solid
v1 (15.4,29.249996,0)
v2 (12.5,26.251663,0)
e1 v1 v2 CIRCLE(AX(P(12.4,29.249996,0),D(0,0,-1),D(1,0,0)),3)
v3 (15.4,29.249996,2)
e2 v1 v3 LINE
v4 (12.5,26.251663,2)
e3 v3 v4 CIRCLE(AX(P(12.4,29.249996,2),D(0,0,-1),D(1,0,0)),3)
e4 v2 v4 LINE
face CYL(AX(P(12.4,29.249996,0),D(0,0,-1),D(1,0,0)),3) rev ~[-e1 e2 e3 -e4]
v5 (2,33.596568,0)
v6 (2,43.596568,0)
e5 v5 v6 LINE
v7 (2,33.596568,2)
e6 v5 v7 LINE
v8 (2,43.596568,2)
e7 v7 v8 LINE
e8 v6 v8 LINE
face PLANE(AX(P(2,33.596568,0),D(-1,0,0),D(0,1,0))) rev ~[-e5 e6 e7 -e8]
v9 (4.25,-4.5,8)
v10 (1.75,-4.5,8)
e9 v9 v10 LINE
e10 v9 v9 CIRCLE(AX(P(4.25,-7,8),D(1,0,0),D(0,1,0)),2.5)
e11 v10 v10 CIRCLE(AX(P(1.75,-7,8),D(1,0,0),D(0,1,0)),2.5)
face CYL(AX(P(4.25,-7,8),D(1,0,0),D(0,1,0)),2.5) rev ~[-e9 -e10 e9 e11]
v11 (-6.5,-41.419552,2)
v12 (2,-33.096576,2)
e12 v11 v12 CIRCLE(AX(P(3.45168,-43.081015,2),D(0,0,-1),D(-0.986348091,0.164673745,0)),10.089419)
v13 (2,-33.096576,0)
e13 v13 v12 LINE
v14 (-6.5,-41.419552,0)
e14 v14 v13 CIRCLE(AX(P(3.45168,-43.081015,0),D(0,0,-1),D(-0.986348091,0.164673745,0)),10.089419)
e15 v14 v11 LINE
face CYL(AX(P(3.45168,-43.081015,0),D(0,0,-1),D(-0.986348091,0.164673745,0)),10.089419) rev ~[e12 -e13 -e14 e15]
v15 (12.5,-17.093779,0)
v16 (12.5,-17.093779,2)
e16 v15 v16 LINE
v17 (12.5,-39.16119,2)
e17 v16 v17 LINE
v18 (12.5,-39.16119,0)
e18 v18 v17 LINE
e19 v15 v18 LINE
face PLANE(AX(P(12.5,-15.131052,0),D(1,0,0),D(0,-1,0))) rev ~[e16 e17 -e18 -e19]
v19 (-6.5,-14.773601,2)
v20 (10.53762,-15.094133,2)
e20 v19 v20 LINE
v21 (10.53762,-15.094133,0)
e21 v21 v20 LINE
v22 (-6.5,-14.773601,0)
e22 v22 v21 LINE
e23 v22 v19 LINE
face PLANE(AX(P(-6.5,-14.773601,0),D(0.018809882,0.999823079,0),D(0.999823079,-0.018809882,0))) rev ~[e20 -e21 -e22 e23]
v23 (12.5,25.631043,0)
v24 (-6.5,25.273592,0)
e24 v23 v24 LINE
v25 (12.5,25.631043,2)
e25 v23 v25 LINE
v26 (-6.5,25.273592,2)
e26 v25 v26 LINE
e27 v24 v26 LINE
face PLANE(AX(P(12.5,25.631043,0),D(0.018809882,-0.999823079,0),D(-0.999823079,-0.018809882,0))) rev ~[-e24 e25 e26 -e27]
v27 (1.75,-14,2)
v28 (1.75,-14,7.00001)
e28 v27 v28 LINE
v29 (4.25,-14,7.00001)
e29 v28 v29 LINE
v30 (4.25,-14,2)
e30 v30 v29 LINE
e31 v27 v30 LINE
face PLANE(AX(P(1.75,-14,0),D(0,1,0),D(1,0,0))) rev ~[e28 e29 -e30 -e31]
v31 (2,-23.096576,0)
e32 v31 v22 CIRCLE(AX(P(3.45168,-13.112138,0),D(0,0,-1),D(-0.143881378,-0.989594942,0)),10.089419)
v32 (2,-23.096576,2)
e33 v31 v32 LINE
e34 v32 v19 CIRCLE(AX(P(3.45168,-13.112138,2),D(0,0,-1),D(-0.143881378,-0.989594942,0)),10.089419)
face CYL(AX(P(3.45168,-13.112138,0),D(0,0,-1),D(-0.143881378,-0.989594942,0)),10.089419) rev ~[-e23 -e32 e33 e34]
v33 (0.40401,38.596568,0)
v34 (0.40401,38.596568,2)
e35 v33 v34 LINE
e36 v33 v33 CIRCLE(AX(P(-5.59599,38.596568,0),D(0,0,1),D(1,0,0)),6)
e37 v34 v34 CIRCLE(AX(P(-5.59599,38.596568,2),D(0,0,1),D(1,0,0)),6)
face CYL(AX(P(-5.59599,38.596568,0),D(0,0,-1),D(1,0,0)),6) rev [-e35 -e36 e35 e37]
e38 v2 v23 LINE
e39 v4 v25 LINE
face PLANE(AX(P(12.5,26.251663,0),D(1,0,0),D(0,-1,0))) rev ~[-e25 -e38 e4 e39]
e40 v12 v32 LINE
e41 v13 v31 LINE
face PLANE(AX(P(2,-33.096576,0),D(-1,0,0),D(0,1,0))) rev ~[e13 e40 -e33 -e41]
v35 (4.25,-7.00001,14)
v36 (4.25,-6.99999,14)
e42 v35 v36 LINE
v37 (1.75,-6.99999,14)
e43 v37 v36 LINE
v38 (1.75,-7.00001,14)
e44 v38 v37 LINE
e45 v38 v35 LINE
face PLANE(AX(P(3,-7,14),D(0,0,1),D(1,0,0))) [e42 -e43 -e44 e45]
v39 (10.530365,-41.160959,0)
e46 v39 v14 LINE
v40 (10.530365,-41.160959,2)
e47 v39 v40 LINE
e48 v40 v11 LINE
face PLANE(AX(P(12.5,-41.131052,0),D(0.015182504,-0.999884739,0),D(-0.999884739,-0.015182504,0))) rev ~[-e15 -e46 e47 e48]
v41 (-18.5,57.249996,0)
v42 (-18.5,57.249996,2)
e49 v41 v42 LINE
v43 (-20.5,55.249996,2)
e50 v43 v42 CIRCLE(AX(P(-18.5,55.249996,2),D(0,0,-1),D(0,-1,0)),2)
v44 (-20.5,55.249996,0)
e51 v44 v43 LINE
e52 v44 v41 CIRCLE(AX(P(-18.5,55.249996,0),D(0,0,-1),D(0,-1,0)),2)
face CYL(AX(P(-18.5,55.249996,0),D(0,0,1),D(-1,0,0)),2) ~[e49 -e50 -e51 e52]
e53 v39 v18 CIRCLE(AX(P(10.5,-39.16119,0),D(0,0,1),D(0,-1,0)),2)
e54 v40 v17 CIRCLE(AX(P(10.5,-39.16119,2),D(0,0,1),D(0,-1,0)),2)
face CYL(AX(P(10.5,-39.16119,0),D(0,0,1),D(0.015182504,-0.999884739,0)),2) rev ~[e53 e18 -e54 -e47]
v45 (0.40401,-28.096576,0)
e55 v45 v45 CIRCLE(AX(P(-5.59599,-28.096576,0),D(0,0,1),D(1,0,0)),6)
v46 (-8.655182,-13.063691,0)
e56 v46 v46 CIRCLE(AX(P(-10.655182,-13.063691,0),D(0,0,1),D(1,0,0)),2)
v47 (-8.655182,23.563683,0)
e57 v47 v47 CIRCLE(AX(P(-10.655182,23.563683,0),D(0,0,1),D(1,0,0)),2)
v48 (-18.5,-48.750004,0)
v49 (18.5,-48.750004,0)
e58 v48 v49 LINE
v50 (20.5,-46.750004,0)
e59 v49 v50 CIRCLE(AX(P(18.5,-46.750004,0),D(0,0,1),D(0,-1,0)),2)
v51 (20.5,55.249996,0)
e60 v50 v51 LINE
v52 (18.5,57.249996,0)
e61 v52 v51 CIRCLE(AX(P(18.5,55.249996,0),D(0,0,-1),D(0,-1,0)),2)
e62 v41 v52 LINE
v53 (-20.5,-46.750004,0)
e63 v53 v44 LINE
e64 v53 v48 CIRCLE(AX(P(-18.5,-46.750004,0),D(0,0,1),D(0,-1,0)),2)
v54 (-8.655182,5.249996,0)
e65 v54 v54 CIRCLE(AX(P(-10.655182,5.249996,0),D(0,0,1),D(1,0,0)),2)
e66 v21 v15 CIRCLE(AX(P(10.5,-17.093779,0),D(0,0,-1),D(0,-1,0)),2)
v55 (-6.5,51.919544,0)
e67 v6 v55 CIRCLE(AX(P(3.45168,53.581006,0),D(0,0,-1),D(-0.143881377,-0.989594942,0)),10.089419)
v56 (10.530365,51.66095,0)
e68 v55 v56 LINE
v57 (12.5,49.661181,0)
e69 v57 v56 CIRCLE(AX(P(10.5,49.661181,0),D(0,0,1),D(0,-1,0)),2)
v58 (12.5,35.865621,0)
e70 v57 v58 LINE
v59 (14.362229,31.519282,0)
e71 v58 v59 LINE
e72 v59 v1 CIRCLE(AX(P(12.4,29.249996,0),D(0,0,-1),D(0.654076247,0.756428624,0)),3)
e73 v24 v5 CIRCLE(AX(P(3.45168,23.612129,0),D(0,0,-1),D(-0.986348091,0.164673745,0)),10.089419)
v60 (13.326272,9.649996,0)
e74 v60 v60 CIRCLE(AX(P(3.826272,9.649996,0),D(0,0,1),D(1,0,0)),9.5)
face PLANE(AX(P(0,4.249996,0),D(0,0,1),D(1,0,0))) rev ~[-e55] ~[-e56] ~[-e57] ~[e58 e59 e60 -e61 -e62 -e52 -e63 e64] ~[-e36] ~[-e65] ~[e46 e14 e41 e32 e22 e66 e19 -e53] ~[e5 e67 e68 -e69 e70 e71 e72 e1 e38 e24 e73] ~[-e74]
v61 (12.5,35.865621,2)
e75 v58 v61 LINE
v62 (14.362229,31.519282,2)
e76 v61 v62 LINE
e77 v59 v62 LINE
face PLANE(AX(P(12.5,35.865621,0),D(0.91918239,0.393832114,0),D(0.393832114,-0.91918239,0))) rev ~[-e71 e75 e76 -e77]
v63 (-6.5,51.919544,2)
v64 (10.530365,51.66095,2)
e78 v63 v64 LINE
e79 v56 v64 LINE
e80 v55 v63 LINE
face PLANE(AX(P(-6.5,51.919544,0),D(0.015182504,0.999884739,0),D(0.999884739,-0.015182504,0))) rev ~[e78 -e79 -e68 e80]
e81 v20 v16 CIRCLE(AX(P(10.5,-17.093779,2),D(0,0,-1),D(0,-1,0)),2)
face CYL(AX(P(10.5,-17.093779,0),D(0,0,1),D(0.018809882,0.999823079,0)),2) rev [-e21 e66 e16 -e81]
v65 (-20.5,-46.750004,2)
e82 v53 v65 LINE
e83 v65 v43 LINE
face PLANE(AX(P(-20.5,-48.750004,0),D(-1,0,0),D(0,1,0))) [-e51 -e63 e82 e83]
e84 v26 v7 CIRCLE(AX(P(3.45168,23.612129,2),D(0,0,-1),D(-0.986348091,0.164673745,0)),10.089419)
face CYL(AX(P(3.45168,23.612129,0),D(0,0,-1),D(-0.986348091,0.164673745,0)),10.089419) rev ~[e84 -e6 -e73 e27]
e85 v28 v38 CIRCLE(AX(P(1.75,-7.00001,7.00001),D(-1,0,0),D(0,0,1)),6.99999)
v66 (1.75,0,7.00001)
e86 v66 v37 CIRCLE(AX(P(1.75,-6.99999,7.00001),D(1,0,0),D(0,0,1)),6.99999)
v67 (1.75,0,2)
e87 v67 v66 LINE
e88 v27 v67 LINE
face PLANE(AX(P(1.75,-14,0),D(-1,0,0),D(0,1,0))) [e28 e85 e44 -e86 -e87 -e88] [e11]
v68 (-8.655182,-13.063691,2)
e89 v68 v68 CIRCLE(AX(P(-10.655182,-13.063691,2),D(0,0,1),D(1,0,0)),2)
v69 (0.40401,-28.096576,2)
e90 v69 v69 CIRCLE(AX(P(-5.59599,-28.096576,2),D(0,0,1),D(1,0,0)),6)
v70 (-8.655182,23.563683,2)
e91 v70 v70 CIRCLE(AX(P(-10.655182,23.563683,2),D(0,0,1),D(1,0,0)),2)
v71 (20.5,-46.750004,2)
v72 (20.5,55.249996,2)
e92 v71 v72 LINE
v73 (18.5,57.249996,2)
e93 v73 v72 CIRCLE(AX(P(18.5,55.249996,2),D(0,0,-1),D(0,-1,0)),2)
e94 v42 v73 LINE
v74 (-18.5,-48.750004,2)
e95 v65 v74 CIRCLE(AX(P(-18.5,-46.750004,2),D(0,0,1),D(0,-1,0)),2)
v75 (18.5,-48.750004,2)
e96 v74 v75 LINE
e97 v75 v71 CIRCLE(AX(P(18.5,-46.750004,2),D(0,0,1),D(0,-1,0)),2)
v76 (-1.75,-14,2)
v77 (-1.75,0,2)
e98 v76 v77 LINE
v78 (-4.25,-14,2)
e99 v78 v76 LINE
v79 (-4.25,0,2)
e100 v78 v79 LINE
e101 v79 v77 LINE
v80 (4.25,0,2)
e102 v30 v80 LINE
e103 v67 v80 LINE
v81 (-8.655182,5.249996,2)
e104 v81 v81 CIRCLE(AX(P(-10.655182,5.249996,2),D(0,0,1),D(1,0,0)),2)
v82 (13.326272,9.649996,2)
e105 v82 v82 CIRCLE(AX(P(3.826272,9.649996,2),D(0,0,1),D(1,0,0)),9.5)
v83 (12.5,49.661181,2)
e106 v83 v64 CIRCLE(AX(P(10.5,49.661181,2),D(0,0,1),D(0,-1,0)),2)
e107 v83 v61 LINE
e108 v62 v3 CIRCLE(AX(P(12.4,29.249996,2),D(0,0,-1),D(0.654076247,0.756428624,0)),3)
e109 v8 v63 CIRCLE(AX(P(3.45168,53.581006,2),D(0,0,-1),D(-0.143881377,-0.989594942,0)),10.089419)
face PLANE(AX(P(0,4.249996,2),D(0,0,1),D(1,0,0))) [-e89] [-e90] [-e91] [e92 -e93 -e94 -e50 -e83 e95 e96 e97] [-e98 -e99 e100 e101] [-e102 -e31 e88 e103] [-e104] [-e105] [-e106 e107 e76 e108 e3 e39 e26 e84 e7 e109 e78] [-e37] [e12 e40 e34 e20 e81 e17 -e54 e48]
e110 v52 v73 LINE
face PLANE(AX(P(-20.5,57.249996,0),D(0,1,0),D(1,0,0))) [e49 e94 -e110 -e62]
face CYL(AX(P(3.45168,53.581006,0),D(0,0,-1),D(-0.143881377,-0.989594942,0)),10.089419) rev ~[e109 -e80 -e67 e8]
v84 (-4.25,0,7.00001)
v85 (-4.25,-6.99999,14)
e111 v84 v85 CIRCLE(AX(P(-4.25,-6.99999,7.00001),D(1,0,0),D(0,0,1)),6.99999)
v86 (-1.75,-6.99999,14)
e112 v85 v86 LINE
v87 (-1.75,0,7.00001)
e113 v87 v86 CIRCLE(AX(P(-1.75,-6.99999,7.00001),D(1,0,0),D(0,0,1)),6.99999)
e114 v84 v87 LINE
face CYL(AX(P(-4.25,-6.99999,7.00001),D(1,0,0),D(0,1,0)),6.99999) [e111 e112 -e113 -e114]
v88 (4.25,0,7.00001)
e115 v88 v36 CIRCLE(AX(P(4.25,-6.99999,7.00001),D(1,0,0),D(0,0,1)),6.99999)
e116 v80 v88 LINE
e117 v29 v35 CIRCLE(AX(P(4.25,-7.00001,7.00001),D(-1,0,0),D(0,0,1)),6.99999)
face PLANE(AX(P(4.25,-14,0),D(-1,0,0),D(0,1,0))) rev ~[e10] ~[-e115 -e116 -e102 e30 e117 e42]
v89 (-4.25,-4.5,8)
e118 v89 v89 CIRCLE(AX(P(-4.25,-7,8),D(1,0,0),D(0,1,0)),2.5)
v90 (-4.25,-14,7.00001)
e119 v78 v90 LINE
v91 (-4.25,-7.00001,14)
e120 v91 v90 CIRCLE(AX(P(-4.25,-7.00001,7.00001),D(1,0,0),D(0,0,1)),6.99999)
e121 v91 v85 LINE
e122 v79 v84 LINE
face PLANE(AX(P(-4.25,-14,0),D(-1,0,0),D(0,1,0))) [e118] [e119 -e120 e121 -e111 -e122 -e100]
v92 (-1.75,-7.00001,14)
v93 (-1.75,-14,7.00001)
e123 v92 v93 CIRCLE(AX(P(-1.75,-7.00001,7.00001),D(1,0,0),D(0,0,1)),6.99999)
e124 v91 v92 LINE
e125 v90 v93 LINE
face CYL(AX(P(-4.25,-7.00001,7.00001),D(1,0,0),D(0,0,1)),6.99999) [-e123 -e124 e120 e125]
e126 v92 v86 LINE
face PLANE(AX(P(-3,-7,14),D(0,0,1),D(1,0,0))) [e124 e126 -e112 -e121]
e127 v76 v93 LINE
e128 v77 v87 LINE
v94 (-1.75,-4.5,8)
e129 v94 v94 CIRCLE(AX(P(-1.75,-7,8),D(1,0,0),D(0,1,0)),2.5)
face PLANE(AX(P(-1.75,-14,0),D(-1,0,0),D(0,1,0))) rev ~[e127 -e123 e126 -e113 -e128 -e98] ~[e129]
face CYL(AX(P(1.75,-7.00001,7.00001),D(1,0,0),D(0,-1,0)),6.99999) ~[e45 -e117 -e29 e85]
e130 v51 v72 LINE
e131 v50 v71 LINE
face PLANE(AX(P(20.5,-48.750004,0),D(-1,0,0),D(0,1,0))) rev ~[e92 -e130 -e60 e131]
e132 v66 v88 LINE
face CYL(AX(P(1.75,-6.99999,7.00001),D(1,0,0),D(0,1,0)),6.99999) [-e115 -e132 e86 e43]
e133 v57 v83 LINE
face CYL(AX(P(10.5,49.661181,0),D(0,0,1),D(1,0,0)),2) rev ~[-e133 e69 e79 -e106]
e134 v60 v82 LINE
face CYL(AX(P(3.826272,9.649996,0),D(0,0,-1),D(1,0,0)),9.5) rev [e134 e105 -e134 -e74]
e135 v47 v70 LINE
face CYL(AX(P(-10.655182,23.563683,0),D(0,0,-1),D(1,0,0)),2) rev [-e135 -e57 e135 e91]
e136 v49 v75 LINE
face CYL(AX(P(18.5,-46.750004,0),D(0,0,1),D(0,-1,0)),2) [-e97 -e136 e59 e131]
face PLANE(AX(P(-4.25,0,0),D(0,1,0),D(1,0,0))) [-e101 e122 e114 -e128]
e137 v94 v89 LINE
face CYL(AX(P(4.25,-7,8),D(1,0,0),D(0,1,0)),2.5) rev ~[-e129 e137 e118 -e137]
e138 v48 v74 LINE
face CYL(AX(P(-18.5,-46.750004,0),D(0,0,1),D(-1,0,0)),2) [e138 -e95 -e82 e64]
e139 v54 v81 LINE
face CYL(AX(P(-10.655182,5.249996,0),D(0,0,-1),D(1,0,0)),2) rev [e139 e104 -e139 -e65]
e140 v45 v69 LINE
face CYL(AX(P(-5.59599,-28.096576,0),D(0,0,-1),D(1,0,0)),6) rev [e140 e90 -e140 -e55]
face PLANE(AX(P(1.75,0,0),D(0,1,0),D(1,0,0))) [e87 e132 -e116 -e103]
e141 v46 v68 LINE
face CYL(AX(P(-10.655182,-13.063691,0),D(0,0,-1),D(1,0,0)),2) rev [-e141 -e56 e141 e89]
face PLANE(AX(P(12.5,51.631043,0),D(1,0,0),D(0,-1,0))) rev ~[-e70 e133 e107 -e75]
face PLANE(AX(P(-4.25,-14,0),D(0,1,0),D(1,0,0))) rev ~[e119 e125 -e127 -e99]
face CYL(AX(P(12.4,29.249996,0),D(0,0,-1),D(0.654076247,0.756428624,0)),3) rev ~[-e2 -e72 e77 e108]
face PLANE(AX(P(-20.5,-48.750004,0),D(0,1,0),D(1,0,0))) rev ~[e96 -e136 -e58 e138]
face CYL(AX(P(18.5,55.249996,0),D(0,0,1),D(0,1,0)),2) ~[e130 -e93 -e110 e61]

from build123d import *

# Parameters (mm, degrees)
F0_W     = 41
F0_H     = 106
F0_R     = 6
F0_R_2   = 2
F0_W_2   = 2.5
F0_H_2   = 14
F0_R_3   = 9.5
F1_DEPTH = 2
F2_R     = 2
F3_DEPTH = 14
F4_R     = 6.99999
F5_R     = 2.5
F6_DEPTH = 25


# Not quite as in the source:
# - a fillet or chamfer is up to 0.001 mm smaller than in the source, because OpenCascade refuses the exact size


with BuildPart() as f1:
    # F0 (on Top) → F1 (new body)
    with BuildSketch(Plane.XY):
        with Locations((0, 4.2499956787)):
            Rectangle(F0_W, F0_H)
        with Locations((-5.5959895056, -28.0965764523)):
            Circle(F0_R, mode=Mode.SUBTRACT)
        with Locations((-10.6551818848, -13.0636913106)):
            Circle(F0_R_2, mode=Mode.SUBTRACT)
        with Locations((-3, -7)):
            Rectangle(F0_W_2, F0_H_2, mode=Mode.SUBTRACT)
        with BuildLine():
            ThreePointArc((2, -23.0965764523), (-3.6071540429, -20.3211082876), (-6.5, -14.7736005353))
            Line((-6.5, -14.7736005353), (12.5, -15.1310515412))
            Line((12.5, -15.1310515412), (12.5, -41.1310515412))
            Line((12.5, -41.1310515412), (-6.5, -41.4195523692))
            ThreePointArc((-6.5, -41.4195523692), (-3.6071540429, -35.8720446169), (2, -33.0965764523))
            Line((2, -33.0965764523), (2, -23.0965764523))
        make_face(mode=Mode.SUBTRACT)
        with Locations((3, -7)):
            Rectangle(F0_W_2, F0_H_2, mode=Mode.SUBTRACT)
        with Locations((-10.6551818848, 5.2499956787)):
            Circle(F0_R_2, mode=Mode.SUBTRACT)
        with Locations((-10.6551818848, 23.5636826679)):
            Circle(F0_R_2, mode=Mode.SUBTRACT)
        with Locations((-5.5959895056, 38.5965678096)):
            Circle(F0_R, mode=Mode.SUBTRACT)
        with Locations((3.8262721598, 9.6499956787)):
            Circle(F0_R_3, mode=Mode.SUBTRACT)
        with BuildLine():
            ThreePointArc((2, 43.5965678096), (-3.6071540429, 46.3720359742), (-6.5, 51.9195437265))
            Line((-6.5, 51.9195437265), (12.5, 51.6310428985))
            Line((12.5, 51.6310428985), (12.5, 35.8656205144))
            Line((12.5, 35.8656205144), (14.3622287411, 31.5192815504))
            ThreePointArc((14.3622287411, 31.5192815504), (15.1282490927, 30.4976562448), (15.4, 29.2499956787))
            ThreePointArc((15.4, 29.2499956787), (14.5563858653, 27.1643303172), (12.5, 26.2516628086))
            Line((12.5, 26.2516628086), (12.5, 25.6310428985))
            Line((12.5, 25.6310428985), (-6.5, 25.2735918926))
            ThreePointArc((-6.5, 25.2735918926), (-3.6071540429, 30.8210996449), (2, 33.5965678096))
            Line((2, 33.5965678096), (2, 43.5965678096))
        make_face(mode=Mode.SUBTRACT)
    extrude(amount=F1_DEPTH)

    # F2
    f2_edges = [f1.edges().sort_by_distance(p)[0] for p in [
        (20.5, -48.750004, 1),
        (-20.5, -48.750004, 1),
        (12.5, -15.131052, 1),
        (12.5, -41.131052, 1),
        (12.5, 51.631043, 1),
        (20.5, 57.249996, 1),
        (-20.5, 57.249996, 1),
    ]]
    fillet(f2_edges, radius=F2_R)

    # F0 (on Top) → F3 (join)
    with BuildSketch(Plane.XY):
        with Locations((-3, -7)):
            Rectangle(F0_W_2, F0_H_2)
        with Locations((3, -7)):
            Rectangle(F0_W_2, F0_H_2)
    extrude(amount=F3_DEPTH)

    # F4 (radius 7 in the source; OpenCascade refuses exactly that, so slightly less here)
    f4_edges = [f1.edges().sort_by_distance(p)[0] for p in [
        (3, 0, 14),
        (3, -14, 14),
        (-3, -14, 14),
        (-3, 0, 14),
    ]]
    fillet(f4_edges, radius=F4_R)

    # F5 (on face) → F6 (cut)
    with BuildSketch(Plane.YZ.offset(4.25)):
        with Locations((-7, 8)):
            Circle(F5_R)
    extrude(amount=-F6_DEPTH, mode=Mode.SUBTRACT)


solid = f1.part
